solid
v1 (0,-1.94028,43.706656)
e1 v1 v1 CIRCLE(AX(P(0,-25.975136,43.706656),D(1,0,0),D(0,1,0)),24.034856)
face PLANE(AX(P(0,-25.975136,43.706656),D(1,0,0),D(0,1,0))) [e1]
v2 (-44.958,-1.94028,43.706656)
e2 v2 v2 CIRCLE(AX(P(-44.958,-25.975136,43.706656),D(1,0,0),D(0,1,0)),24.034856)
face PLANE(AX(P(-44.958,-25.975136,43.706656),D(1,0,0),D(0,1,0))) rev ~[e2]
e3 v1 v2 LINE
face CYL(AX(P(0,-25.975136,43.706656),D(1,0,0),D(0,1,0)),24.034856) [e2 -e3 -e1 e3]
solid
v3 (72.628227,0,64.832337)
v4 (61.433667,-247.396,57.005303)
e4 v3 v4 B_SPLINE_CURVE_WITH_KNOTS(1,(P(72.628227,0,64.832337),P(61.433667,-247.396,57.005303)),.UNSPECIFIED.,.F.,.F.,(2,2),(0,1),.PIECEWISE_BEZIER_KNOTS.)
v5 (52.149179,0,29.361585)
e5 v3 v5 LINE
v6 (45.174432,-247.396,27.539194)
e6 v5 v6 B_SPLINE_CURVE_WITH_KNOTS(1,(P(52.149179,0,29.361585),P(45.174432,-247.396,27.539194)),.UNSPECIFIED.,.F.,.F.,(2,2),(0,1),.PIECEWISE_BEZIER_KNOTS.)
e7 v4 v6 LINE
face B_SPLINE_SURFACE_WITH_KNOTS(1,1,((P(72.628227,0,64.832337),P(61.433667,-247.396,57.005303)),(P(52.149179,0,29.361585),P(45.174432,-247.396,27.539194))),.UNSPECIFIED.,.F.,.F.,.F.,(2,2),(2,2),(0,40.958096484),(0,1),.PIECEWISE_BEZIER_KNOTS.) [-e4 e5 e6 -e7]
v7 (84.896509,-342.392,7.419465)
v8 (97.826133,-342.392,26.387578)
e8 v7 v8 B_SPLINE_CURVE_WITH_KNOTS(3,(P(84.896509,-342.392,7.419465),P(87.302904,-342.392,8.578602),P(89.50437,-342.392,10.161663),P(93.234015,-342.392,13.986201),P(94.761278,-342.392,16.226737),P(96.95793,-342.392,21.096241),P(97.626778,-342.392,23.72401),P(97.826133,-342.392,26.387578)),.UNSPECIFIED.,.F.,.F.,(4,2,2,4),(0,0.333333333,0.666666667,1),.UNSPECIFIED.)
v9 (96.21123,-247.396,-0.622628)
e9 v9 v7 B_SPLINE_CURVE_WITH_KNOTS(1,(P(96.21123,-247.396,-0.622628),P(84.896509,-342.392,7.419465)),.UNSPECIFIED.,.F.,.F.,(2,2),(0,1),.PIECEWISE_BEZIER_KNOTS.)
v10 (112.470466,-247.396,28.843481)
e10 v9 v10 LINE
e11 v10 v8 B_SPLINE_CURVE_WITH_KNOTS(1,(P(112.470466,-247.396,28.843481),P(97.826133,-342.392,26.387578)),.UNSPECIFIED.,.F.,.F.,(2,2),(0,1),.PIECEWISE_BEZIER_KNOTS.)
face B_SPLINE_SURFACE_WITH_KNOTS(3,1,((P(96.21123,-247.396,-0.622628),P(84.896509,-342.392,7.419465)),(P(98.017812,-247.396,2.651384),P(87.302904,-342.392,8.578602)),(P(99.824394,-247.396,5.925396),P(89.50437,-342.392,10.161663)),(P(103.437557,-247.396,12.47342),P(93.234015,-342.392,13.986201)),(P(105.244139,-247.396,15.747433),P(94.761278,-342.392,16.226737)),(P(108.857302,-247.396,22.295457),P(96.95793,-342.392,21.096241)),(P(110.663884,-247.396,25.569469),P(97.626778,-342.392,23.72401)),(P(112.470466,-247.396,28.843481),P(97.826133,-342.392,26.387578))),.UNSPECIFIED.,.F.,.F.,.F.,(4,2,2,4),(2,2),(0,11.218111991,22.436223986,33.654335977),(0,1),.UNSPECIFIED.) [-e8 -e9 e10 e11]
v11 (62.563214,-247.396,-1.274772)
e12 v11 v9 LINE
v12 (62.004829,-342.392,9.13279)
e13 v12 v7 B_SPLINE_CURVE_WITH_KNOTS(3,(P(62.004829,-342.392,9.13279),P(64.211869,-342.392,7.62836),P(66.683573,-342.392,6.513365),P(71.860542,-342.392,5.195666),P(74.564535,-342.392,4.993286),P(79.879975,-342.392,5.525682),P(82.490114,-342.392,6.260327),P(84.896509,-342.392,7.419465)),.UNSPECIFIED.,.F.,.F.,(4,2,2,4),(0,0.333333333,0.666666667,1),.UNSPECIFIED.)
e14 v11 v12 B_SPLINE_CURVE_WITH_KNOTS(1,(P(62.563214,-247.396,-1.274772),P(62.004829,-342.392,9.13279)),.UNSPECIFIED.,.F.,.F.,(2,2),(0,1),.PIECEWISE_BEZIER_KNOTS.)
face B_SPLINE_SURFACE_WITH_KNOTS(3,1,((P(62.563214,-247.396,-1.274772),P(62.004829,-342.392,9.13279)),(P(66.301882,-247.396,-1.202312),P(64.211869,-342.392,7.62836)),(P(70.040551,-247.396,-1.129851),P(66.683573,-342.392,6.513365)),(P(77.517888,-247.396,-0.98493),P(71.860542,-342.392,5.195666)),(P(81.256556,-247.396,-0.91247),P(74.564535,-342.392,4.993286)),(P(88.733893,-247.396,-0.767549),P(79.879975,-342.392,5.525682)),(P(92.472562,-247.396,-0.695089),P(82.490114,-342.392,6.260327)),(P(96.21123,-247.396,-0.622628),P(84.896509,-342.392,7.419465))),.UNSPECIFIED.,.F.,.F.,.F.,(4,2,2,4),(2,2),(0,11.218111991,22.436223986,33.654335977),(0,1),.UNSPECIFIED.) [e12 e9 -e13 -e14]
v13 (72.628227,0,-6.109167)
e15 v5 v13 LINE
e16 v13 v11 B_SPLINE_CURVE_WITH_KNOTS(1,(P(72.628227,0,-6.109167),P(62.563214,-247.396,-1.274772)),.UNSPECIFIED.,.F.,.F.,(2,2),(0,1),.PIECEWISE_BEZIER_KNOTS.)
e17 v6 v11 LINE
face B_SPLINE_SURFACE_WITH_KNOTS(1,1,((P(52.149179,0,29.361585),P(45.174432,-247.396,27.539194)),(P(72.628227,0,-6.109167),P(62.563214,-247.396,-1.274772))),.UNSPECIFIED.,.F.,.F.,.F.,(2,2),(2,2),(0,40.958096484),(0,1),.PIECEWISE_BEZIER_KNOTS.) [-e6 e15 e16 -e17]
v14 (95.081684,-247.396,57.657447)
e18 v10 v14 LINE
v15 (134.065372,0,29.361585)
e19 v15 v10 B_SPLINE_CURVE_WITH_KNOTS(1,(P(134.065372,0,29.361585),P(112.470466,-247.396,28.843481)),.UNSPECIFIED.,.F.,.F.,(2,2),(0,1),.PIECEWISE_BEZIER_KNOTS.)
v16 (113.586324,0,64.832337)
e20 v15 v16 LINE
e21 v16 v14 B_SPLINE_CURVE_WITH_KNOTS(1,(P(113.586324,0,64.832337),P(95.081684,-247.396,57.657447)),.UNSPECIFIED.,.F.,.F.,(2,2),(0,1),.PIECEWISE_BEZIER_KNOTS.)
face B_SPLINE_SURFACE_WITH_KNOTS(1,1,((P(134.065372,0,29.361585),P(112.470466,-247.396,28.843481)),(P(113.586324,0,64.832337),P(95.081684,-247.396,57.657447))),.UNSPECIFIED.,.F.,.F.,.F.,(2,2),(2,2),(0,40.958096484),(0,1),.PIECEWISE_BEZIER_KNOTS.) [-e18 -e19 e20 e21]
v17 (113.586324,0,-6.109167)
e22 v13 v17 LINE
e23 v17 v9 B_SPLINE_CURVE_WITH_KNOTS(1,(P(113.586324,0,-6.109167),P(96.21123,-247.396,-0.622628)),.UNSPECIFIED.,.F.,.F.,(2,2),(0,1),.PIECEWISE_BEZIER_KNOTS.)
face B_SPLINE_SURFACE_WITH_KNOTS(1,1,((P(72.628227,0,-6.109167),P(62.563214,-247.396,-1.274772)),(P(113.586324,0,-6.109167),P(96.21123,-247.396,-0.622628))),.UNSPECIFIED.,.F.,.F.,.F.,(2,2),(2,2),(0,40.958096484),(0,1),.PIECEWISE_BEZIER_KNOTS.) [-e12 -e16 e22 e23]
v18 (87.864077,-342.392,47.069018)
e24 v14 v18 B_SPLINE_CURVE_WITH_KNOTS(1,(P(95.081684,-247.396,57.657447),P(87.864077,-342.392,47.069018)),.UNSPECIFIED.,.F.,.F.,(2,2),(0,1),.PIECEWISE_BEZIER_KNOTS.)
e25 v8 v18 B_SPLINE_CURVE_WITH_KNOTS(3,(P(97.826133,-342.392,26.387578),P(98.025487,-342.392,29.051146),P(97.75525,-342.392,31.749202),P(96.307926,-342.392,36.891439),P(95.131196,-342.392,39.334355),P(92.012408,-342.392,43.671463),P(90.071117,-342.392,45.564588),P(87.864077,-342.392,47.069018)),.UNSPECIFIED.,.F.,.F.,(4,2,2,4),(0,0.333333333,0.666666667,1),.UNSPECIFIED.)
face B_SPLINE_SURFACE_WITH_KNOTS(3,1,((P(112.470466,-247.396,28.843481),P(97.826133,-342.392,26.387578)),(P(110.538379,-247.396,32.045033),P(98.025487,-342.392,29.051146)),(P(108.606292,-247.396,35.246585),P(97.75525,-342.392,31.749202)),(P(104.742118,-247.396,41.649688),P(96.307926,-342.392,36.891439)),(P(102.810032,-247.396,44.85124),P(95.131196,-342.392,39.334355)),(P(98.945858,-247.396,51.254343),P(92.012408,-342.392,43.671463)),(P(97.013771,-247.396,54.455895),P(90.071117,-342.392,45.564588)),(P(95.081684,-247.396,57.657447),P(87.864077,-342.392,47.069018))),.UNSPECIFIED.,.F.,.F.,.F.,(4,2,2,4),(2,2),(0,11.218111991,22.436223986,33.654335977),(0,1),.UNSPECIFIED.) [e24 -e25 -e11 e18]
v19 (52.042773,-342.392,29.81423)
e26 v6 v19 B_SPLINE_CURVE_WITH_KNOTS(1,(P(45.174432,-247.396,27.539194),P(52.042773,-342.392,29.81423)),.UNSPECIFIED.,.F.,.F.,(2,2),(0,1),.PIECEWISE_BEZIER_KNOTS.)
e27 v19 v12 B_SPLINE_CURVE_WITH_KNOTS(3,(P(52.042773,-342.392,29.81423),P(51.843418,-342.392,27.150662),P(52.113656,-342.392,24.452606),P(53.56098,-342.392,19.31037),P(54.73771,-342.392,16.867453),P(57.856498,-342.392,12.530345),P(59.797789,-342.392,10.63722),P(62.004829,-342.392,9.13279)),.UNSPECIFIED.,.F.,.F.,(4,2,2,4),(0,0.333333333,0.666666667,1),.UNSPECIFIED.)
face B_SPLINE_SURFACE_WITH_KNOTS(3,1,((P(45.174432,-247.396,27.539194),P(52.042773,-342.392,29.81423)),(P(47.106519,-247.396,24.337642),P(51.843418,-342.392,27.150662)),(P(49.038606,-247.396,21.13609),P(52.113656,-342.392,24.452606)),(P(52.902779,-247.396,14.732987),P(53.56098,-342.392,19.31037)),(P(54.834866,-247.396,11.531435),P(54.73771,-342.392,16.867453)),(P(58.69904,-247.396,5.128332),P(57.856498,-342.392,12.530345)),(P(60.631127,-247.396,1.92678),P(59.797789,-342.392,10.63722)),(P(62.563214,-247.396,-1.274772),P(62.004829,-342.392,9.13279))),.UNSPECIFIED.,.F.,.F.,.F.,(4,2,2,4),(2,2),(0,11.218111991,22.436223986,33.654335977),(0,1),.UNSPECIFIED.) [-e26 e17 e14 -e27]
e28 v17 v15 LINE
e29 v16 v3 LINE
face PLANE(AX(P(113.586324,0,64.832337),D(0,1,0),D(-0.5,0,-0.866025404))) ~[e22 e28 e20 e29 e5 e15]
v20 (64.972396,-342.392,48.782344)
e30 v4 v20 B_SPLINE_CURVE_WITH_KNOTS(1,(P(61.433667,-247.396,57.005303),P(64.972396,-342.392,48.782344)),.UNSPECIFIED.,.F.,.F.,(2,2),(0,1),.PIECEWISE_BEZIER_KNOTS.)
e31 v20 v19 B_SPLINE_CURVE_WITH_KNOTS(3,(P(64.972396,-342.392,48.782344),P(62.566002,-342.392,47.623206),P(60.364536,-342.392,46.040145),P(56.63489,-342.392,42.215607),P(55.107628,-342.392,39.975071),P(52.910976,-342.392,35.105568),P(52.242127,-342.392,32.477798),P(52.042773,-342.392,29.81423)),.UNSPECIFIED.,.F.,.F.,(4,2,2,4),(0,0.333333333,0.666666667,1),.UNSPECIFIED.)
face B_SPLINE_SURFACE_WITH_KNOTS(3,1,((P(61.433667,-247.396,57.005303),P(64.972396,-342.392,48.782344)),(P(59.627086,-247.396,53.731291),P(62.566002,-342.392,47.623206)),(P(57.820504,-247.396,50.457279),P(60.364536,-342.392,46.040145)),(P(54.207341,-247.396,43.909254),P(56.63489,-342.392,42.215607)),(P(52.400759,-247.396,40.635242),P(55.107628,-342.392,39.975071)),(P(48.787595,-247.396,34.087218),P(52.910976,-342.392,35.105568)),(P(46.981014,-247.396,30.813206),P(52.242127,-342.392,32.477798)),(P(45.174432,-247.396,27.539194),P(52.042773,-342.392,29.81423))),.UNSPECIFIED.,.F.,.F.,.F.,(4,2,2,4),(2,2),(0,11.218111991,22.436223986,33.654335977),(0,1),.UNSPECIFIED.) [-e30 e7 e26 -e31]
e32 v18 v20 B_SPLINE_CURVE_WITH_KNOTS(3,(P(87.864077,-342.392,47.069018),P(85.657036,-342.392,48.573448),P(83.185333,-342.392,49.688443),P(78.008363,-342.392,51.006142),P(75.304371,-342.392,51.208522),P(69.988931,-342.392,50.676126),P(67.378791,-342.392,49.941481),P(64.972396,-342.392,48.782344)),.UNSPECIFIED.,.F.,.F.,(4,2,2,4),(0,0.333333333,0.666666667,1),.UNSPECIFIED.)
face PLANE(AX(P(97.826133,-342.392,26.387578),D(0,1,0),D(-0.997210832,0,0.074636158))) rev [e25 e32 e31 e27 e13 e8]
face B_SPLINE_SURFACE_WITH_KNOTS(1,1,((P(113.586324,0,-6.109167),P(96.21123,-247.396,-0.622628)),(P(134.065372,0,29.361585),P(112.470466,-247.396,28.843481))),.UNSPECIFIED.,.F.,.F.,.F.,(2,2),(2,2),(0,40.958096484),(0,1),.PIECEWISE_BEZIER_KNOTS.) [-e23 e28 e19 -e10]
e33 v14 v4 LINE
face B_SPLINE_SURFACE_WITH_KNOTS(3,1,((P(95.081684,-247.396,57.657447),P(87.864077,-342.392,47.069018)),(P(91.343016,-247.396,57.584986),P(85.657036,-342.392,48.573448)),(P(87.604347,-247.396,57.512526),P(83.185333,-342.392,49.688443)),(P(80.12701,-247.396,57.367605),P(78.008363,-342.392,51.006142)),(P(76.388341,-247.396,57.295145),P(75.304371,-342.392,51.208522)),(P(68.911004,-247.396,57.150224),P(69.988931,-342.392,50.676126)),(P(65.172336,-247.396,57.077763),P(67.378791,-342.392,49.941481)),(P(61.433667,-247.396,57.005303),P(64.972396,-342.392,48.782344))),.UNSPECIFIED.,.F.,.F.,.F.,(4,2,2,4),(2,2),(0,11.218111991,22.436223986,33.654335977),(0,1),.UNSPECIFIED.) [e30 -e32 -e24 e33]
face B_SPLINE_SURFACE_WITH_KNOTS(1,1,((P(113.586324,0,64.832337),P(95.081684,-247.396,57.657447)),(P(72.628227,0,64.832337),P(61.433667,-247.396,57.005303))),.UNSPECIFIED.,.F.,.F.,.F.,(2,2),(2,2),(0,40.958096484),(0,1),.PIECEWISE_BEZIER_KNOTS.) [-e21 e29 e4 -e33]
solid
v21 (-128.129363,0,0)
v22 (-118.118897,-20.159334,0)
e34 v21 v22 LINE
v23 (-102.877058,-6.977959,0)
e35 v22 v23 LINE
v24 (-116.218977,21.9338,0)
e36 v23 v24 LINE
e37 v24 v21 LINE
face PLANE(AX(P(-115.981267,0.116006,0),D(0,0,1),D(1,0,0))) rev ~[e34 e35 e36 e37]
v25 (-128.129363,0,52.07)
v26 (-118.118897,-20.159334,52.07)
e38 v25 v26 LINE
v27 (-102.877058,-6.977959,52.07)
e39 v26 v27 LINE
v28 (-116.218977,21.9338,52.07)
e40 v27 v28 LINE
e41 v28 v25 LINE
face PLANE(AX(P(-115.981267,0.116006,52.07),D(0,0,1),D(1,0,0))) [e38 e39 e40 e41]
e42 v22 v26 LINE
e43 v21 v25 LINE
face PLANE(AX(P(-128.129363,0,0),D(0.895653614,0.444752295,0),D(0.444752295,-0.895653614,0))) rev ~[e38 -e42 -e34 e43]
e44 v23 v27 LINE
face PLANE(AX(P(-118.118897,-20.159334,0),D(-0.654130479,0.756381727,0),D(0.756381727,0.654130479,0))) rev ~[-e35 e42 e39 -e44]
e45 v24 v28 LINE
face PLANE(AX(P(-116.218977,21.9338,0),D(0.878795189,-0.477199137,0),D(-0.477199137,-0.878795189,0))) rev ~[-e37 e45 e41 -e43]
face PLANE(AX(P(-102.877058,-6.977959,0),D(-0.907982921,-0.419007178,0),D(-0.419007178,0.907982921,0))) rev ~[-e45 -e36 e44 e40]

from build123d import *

# Parameters (mm, degrees)
F1_DEPTH = 52.07
F2_R     = 24.0348564639
F3_DEPTH = 44.958


# Not quite as in the source:
# - the arcs of a loft's sections are written as splines that run evenly, so that the points pair up as in the source's solid


with BuildPart() as f1:
    # F0 (on Top) → F1 (new body)
    with BuildSketch(Plane.XY):
        Polygon((-128.12936306, 0), (-118.1188970804, -20.1593339443), (-102.8770580888, -6.9779586047), (-116.2189766765, 21.9337996095), align=None)
    extrude(amount=F1_DEPTH)


with BuildPart() as f3:
    # F2 (on Right) → F3 (new body)
    with BuildSketch(Plane.YZ):
        with Locations((-25.9751360863, 43.7066555023)):
            Circle(F2_R)
    extrude(amount=-F3_DEPTH)


with BuildPart() as f7:
    # F4 (on Front) → F7 section 0
    with BuildSketch(Plane.XZ):
        Polygon((113.5863239066, 64.8323372006), (72.628227423, 64.8323372006), (52.1491791811, 29.3615851551), (72.628227423, -6.1091668904), (113.5863239066, -6.1091668904), (134.0653721485, 29.3615851551), align=None)
    # F6 (on offset) → F7 section 1
    with BuildSketch(Plane.XZ.offset(247.396)):
        Polygon((112.4704657081, 28.843481159), (95.0816841837, 57.6574466469), (61.4336673252, 57.0053028498), (45.1744319912, 27.5391935648), (62.5632135156, -1.274771923), (96.2112303741, -0.6226281259), align=None)
    loft()

    # F7_face (on face) → F10 section 0
    with BuildSketch(Plane(origin=(78.8224488497, -247.396, 28.1913373619), x_dir=(1, 0, 0), z_dir=(0, -1, 0))):
        Polygon((33.6480168585, 0.6521437971), (16.259235334, 29.4661092849), (-17.3887815244, 28.8139654879), (-33.6480168585, -0.6521437971), (-16.259235334, -29.4661092849), (17.3887815244, -28.8139654879), align=None)
    # F9 (on offset) → F10 section 1
    with BuildSketch(Plane.XZ.offset(342.392)):
        with BuildLine():
            add(Edge.make_bspline(
                [(87.8640765562, 47.0690177587), (85.6570363119, 48.5734477992), (83.1853326809, 49.6884427268), (78.0083630622, 51.0061419006), (75.3043706745, 51.2085219762), (69.9889308654, 50.6761262752), (67.3787911096, 49.9414814748), (64.9723963541, 48.7823435763)],
                knots=[0, 0, 0, 0, 0.3333333333, 0.3333333333, 0.6666666667, 0.6666666667, 1, 1, 1, 1], degree=3))
            add(Edge.make_bspline(
                [(64.9723963541, 48.7823435763), (62.5660015987, 47.6232056779), (60.3645358508, 46.0401450066), (56.6348900825, 42.2156073891), (55.1076276019, 39.9750713274), (52.9109758993, 35.1055675701), (52.2421270813, 32.4777978338), (52.0427725701, 29.8142298949)],
                knots=[0, 0, 0, 0, 0.3333333333, 0.3333333333, 0.6666666667, 0.6666666667, 1, 1, 1, 1], degree=3))
            add(Edge.make_bspline(
                [(52.0427725701, 29.8142298949), (51.843418059, 27.150661956), (52.1136559421, 24.4526063571), (53.5609797924, 19.3103695658), (54.7377096996, 16.8674534286), (57.856497806, 12.5303453722), (59.7977887439, 10.6372204364), (62.0048289881, 9.1327903958)],
                knots=[0, 0, 0, 0, 0.3333333333, 0.3333333333, 0.6666666667, 0.6666666667, 1, 1, 1, 1], degree=3))
            add(Edge.make_bspline(
                [(62.0048289881, 9.1327903958), (64.2118692324, 7.6283603553), (66.6835728634, 6.5133654277), (71.8605424821, 5.195666254), (74.5645348698, 4.9932861784), (79.8799746788, 5.5256818794), (82.4901144347, 6.2603266798), (84.8965091901, 7.4194645782)],
                knots=[0, 0, 0, 0, 0.3333333333, 0.3333333333, 0.6666666667, 0.6666666667, 1, 1, 1, 1], degree=3))
            add(Edge.make_bspline(
                [(84.8965091901, 7.4194645782), (87.3029039455, 8.5786024767), (89.5043696934, 10.1616631479), (93.2340154618, 13.9862007655), (94.7612779424, 16.2267368271), (96.957929645, 21.0962405845), (97.626778463, 23.7240103208), (97.8261329741, 26.3875782597)],
                knots=[0, 0, 0, 0, 0.3333333333, 0.3333333333, 0.6666666667, 0.6666666667, 1, 1, 1, 1], degree=3))
            add(Edge.make_bspline(
                [(97.8261329741, 26.3875782597), (98.0254874853, 29.0511461986), (97.7552496022, 31.7492017975), (96.3079257519, 36.8914385888), (95.1311958447, 39.334354726), (92.0124077383, 43.6714627824), (90.0711168004, 45.5645877182), (87.8640765562, 47.0690177587)],
                knots=[0, 0, 0, 0, 0.3333333333, 0.3333333333, 0.6666666667, 0.6666666667, 1, 1, 1, 1], degree=3))
        make_face()
    loft(ruled=True)


solid = Compound([f1.part, f3.part, f7.part])
